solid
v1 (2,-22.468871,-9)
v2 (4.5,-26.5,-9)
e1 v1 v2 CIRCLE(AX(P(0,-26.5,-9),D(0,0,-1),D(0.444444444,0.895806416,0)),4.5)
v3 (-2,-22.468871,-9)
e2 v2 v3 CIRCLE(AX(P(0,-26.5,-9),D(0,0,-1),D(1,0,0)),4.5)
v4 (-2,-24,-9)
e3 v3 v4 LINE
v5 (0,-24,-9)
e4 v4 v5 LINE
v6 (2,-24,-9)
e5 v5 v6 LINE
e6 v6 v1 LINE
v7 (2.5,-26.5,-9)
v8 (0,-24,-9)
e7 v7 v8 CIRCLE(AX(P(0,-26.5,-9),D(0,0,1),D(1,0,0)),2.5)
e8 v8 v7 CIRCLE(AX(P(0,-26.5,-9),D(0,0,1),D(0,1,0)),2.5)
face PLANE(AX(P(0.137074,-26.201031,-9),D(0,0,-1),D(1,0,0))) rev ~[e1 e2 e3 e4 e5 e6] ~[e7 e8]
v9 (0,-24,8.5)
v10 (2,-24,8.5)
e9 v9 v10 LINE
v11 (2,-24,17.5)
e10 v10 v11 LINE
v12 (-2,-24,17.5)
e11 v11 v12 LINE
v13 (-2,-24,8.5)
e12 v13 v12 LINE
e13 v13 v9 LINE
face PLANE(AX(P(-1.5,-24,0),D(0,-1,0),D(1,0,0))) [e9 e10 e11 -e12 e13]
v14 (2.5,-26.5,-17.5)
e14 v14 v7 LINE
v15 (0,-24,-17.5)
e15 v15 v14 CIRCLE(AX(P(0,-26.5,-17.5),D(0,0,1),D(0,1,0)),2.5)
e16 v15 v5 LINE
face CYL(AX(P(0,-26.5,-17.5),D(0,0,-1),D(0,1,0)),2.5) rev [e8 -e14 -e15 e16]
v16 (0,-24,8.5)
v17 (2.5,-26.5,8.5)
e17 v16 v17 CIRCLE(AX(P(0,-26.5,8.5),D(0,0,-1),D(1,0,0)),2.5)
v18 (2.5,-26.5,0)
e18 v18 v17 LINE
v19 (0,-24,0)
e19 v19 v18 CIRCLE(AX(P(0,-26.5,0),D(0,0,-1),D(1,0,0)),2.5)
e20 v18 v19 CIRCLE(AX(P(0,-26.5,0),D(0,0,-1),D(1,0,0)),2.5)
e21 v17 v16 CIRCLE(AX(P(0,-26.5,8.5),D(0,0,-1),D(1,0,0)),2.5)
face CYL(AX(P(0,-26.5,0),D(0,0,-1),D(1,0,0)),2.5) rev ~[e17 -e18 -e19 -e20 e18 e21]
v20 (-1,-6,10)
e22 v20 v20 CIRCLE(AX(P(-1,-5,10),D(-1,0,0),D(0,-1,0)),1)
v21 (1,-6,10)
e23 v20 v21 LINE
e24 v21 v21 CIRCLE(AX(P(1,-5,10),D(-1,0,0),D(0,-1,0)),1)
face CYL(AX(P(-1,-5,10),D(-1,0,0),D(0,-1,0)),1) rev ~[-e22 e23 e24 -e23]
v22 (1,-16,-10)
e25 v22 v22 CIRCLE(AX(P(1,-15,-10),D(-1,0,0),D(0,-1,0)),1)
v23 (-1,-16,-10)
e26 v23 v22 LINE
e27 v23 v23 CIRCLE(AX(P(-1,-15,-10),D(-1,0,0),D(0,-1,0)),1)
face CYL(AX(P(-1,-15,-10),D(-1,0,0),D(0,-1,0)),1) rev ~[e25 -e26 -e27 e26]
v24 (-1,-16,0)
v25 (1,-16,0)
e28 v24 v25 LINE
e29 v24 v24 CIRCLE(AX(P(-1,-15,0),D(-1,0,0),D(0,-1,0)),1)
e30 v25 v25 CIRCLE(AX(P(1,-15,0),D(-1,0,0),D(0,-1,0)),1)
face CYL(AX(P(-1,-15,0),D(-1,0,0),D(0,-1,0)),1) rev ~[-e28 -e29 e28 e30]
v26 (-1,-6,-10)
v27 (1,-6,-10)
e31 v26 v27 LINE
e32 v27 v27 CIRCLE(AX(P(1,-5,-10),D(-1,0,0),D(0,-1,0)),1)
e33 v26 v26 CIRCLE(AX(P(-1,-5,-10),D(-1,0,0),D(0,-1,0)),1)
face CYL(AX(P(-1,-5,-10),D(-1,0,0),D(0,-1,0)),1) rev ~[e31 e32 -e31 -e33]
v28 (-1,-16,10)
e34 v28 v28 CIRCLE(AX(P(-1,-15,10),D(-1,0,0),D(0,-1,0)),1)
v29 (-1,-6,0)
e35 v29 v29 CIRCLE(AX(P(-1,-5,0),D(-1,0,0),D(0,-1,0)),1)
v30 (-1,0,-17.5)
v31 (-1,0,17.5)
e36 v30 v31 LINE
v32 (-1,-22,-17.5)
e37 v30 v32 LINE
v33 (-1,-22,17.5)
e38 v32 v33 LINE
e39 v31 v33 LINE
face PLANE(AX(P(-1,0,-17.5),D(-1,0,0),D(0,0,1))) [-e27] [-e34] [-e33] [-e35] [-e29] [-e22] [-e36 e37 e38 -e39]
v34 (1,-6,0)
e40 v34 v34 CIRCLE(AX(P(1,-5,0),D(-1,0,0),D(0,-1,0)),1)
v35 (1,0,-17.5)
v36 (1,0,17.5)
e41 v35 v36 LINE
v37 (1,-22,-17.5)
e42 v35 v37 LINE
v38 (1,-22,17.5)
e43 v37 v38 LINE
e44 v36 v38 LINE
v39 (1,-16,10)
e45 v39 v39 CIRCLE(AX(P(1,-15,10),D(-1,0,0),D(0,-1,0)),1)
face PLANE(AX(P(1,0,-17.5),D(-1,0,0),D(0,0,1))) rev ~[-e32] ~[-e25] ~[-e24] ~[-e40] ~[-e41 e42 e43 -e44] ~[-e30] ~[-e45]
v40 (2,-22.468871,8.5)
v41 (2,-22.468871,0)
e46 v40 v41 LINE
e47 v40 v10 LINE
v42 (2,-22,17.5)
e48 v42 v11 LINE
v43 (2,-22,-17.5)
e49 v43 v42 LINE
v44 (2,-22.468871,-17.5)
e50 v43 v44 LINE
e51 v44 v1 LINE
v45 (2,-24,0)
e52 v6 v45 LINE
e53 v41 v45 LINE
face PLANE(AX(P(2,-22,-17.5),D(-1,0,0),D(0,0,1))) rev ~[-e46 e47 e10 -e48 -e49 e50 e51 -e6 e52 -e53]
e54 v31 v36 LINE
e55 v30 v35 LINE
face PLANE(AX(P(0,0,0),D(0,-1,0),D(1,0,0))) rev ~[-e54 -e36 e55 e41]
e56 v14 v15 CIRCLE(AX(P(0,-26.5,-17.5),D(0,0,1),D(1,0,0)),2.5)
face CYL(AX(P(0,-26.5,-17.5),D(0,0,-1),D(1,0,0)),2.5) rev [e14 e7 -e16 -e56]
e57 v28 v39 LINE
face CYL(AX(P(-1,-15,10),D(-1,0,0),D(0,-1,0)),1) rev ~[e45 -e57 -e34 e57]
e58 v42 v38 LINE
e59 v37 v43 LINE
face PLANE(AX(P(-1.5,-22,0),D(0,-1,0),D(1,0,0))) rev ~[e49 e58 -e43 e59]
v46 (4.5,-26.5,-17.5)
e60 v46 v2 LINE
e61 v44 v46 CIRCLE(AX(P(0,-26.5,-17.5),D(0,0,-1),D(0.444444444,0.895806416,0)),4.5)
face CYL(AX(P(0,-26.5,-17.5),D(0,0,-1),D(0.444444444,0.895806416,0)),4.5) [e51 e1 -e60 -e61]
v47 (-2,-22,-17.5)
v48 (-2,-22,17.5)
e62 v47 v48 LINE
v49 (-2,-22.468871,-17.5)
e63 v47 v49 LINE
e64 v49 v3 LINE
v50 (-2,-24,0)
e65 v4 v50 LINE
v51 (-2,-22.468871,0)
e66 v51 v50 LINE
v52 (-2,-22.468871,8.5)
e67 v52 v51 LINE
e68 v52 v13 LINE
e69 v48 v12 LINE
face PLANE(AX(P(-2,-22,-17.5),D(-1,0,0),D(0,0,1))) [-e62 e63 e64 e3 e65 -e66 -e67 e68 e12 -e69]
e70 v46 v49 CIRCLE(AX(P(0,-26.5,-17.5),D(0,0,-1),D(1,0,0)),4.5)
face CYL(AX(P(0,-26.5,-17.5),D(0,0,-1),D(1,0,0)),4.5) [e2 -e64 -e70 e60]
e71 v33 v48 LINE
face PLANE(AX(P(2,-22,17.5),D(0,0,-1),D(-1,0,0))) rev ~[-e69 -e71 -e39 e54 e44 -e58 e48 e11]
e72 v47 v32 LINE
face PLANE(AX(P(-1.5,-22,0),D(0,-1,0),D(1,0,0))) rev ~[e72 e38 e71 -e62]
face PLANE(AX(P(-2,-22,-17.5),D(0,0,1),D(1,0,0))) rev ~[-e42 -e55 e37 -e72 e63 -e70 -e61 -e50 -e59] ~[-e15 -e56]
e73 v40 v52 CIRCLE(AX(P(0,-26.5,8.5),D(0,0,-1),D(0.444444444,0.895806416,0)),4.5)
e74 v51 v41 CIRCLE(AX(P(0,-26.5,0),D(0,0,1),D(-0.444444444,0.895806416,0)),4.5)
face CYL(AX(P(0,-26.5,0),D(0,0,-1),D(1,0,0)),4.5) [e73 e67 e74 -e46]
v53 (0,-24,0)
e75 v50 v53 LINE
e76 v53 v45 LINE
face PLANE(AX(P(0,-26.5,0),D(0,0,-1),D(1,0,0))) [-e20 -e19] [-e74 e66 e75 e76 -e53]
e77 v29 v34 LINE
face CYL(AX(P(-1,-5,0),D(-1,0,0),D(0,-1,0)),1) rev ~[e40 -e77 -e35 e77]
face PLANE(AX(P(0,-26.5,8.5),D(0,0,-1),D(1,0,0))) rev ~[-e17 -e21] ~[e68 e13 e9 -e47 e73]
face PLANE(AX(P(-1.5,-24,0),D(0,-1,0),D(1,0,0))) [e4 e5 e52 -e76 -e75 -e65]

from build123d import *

# Parameters (mm, degrees)
F0_W     = 2
F0_H     = 35
F1_DEPTH = 22
F2_R     = 1
F3_DEPTH = 25
F4_W     = 1
F4_H     = 35
F4_W_2   = 2
F5_DEPTH = 2
F8_R     = 4.5
F8_R_2   = 2.5
F9_DEPTH = 8.5


# Not quite as in the source:
# - a feature names something its author has since deleted; it is built from what else it names


with BuildPart() as f1:
    # F0 (on Front) → F1 (new body)
    with BuildSketch(Plane.XZ):
        Rectangle(F0_W, F0_H)
    extrude(amount=F1_DEPTH)

    # F2 (on face) → F3 (cut)
    with BuildSketch(Plane(origin=(-1, 0, 0), x_dir=(0, -1, 0), z_dir=(-1, 0, 0))):
        with Locations((5, 10)):
            Circle(F2_R)
        with Locations((15, 10)):
            Circle(F2_R)
        with Locations((15, 0)):
            Circle(F2_R)
        with Locations((5, 0)):
            Circle(F2_R)
        with Locations((5, -10)):
            Circle(F2_R)
        with Locations((15, -10)):
            Circle(F2_R)
    extrude(amount=-F3_DEPTH, mode=Mode.SUBTRACT)

    # F4 (on face) → F5 (join)
    with BuildSketch(Plane.XZ.offset(22)):
        with Locations((-1.5, 0)):
            Rectangle(F4_W, F4_H)
        with Locations((1.5, 0)):
            Rectangle(F4_W, F4_H)
        Rectangle(F4_W_2, F4_H)
    extrude(amount=F5_DEPTH)

    # F8 (on offset) + F6 (on face) → F9 (join)
    with BuildSketch(Plane(origin=(0, 0, 0), x_dir=(1, 0, 0), z_dir=(0, 0, -1))):
        with Locations((0, 26.5)):
            Circle(F8_R)
        with Locations((0, 26.5)):
            Circle(F8_R_2, mode=Mode.SUBTRACT)
    with BuildSketch(Plane(origin=(0, 0, -17.5), x_dir=(1, 0, 0), z_dir=(0, 0, -1))):
        with BuildLine():
            Line((-2, 24), (0, 24))
            Line((0, 24), (2, 24))
            Line((2, 24), (2, 22.4688711259))
            ThreePointArc((2, 22.4688711259), (3.8242646352, 24.1282917549), (4.5, 26.5))
            ThreePointArc((4.5, 26.5), (-2.3717082451, 30.3242646352), (-2, 22.4688711259))
            Line((-2, 22.4688711259), (-2, 24))
        make_face()
        with BuildLine():
            ThreePointArc((0, 24), (-1.767766953, 28.267766953), (2.5, 26.5))
            ThreePointArc((2.5, 26.5), (1.767766953, 24.732233047), (0, 24))
        make_face(mode=Mode.SUBTRACT)
    extrude(amount=-F9_DEPTH)


solid = f1.part
